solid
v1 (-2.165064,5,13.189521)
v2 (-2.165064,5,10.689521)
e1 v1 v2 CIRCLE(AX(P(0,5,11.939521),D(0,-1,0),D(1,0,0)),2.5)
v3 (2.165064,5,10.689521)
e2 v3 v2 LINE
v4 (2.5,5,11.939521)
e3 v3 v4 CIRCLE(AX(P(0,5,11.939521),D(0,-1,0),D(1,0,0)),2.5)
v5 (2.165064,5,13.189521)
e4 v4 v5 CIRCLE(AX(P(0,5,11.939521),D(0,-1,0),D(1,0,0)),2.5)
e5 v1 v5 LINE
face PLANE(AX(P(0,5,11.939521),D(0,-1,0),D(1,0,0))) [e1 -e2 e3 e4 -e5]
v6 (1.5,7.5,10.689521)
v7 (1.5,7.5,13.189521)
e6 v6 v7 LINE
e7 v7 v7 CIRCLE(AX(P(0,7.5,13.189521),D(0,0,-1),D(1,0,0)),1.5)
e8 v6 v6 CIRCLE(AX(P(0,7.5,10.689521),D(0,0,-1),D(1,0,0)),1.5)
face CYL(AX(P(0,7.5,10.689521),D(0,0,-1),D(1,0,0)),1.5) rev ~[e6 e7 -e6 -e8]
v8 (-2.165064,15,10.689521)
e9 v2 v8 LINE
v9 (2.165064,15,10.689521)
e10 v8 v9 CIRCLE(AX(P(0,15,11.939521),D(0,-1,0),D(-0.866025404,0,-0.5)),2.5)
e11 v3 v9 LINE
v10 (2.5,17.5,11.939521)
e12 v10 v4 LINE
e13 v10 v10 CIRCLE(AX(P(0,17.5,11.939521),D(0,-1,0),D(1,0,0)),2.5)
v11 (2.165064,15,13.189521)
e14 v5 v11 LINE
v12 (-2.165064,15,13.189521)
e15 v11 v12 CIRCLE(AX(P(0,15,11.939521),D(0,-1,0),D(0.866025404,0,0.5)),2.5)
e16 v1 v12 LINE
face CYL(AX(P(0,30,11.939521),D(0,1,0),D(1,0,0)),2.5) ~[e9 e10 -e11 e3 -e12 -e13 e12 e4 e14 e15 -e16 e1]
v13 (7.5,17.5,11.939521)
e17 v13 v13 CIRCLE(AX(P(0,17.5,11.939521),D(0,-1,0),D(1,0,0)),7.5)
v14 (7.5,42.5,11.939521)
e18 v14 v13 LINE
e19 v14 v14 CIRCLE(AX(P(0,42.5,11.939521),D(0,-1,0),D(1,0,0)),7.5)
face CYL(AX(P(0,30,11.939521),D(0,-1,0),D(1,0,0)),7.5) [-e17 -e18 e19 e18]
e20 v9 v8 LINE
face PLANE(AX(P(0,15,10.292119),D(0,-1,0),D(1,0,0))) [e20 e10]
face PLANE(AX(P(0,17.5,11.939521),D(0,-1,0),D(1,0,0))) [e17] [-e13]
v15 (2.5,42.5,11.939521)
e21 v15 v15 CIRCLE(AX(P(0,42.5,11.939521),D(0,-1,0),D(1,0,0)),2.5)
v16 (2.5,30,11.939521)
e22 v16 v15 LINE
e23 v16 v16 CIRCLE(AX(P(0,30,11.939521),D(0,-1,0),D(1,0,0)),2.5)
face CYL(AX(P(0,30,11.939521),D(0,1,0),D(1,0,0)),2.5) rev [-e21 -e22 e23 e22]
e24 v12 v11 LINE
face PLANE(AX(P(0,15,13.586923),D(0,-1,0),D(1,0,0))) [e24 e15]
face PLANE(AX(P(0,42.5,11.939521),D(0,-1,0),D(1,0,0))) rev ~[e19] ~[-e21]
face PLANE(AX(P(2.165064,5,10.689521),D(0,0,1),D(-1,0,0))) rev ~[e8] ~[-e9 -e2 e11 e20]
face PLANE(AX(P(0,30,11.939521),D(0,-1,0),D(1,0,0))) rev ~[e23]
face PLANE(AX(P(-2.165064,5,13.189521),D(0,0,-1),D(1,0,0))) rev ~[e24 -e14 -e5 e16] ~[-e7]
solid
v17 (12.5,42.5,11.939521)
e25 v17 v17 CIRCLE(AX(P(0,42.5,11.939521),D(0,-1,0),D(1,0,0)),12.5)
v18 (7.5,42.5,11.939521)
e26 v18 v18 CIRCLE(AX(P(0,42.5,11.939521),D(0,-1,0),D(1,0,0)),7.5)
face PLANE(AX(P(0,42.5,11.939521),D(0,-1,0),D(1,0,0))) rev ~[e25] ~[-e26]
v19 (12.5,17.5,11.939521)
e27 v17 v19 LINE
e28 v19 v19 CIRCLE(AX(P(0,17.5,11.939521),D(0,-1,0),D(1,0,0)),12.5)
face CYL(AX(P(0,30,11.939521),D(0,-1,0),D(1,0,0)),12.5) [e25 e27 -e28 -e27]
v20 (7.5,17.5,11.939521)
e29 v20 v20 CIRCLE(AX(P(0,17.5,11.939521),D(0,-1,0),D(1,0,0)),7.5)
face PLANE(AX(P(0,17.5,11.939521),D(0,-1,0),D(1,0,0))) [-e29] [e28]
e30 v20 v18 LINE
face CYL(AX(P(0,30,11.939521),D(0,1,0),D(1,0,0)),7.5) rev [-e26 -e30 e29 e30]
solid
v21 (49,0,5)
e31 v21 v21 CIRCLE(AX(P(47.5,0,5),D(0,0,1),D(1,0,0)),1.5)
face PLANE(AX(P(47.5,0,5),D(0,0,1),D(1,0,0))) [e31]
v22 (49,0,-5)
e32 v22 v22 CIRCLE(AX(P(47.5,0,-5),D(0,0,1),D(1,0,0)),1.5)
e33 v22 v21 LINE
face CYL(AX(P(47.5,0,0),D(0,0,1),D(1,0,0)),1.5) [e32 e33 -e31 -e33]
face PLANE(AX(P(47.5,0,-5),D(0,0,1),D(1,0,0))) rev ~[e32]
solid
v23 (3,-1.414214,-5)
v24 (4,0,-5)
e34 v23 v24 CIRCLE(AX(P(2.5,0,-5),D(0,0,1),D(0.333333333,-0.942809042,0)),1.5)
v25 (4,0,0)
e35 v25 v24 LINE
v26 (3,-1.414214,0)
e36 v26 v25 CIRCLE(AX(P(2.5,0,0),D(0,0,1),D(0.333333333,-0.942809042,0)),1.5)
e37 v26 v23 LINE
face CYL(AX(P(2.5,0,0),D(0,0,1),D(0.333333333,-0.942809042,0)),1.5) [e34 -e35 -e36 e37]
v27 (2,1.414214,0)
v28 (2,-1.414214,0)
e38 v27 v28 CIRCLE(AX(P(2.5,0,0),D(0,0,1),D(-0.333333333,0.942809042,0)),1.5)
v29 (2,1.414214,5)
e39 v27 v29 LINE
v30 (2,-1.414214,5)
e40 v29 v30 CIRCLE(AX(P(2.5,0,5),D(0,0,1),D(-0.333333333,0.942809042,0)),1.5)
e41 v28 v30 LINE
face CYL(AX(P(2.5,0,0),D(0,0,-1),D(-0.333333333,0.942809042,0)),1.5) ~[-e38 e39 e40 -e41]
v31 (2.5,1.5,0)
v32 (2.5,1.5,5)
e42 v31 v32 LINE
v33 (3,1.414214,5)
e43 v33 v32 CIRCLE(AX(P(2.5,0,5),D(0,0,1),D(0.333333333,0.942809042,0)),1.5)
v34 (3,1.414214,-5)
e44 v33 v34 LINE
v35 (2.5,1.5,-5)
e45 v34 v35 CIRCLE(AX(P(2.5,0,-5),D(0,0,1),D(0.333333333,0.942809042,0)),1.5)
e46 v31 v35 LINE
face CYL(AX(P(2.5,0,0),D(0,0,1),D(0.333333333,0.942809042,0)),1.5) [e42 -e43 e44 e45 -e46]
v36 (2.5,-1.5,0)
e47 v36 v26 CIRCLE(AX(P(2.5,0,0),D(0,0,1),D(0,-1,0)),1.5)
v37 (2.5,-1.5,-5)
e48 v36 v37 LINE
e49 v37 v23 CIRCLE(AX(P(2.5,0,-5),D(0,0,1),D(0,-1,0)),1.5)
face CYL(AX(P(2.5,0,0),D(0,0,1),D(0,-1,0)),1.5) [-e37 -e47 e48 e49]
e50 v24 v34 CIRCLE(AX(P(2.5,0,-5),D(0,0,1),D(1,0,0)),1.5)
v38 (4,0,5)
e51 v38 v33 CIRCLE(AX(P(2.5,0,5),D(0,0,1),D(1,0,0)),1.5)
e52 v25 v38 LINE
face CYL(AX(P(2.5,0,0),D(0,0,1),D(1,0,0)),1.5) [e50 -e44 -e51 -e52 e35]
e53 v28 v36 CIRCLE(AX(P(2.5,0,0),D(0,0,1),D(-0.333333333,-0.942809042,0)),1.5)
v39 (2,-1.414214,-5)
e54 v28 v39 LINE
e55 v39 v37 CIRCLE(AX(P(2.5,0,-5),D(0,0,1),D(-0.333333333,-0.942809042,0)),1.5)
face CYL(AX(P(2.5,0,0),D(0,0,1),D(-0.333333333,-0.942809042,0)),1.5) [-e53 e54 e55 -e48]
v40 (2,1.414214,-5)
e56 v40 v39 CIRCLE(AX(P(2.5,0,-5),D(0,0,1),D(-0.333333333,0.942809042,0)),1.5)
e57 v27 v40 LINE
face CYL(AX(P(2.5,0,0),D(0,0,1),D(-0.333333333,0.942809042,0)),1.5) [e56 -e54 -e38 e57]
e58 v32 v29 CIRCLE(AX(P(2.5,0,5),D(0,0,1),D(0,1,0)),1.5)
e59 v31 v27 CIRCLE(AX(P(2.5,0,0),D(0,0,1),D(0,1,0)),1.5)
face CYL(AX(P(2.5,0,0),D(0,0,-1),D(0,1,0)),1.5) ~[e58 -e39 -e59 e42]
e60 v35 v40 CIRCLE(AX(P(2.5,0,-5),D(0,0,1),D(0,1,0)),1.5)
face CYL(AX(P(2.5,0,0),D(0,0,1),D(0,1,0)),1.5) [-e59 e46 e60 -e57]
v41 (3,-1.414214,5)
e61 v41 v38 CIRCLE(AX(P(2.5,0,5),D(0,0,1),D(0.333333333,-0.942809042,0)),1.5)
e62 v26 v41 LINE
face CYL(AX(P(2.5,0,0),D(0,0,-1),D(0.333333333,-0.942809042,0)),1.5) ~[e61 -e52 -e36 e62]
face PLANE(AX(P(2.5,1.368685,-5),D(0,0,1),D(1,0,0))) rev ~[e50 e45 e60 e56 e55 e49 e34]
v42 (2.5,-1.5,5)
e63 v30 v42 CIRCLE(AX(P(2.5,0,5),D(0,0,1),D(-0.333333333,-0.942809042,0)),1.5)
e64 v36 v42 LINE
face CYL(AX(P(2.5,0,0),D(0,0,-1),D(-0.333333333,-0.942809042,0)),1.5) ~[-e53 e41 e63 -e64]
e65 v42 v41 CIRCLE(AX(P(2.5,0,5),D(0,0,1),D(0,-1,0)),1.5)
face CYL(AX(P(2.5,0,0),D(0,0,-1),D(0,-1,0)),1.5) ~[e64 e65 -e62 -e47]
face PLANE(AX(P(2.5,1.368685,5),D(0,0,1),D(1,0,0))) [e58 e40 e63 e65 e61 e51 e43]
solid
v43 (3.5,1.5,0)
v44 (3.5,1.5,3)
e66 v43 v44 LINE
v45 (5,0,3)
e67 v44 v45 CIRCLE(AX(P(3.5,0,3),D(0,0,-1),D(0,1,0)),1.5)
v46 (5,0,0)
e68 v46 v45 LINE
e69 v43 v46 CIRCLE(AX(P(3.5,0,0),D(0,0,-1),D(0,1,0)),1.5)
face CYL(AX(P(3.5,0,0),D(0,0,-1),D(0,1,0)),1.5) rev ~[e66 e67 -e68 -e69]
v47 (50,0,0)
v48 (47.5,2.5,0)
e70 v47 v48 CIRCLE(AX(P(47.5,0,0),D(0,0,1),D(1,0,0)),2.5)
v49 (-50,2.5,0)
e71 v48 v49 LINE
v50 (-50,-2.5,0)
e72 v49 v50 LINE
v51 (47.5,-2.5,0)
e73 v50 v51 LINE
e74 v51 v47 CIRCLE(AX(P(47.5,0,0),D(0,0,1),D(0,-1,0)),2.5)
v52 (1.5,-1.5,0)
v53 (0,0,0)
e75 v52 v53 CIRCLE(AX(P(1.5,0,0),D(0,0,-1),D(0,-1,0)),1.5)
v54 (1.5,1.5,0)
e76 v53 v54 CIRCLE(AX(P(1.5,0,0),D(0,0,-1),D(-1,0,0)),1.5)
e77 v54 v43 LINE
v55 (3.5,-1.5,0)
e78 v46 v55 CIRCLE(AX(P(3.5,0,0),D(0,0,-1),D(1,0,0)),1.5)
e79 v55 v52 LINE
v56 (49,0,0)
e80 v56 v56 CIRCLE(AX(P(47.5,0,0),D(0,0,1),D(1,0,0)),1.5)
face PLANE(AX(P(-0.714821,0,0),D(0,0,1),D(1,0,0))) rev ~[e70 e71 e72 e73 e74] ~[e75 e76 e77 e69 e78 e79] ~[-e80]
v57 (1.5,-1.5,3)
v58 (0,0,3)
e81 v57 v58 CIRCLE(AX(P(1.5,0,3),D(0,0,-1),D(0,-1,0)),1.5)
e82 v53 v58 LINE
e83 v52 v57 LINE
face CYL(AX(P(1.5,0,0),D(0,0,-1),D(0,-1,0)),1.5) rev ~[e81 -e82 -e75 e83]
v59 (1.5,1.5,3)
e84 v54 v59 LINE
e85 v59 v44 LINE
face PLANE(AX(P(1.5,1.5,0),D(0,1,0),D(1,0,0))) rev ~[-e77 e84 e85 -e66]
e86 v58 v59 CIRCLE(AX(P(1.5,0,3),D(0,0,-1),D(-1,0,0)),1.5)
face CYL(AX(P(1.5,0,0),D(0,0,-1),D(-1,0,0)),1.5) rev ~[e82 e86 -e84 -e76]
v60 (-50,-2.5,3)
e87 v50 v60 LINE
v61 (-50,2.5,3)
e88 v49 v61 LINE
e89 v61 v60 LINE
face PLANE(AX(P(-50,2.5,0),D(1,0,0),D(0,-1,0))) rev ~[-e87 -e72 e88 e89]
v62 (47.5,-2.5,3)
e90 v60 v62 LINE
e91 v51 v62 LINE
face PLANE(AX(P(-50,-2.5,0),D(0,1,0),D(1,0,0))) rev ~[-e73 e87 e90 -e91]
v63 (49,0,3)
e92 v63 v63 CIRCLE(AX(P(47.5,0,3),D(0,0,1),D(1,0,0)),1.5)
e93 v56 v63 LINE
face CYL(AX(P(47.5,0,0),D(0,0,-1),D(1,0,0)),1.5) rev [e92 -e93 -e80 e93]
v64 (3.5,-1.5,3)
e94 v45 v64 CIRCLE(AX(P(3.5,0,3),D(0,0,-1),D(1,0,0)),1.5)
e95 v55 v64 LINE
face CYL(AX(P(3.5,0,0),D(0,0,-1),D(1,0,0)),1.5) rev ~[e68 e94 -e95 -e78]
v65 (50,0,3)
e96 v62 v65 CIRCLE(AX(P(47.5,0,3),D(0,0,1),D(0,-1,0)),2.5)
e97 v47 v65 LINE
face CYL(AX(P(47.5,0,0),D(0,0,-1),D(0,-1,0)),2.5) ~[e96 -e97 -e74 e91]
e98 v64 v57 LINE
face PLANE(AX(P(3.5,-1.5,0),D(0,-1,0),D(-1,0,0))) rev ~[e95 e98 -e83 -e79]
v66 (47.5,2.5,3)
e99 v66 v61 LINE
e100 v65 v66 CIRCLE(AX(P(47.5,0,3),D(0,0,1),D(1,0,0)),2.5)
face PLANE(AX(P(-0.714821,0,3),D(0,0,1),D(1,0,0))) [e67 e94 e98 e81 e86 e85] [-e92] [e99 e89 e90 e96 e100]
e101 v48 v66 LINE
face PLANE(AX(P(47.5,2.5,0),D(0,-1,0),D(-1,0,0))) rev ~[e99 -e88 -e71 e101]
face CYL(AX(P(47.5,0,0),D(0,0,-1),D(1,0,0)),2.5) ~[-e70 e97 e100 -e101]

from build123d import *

# Parameters (mm, degrees)
F0_R      = 1.5
F1_DEPTH  = 3
F2_DEPTH  = 5
F4_R      = 12.5
F4_R_2    = 7.5
F5_DEPTH  = 12.5
F4_R_3    = 2.5
F6_DEPTH  = 12.5
F7_DEPTH  = 25
F9_DEPTH  = 10
F10_R     = 1.5
F11_DEPTH = 25


# Not quite as in the source:
# - a feature names something its author has since deleted; it is built from what else it names


with BuildPart() as f1:
    # F0 (on Top) → F1 (new body)
    with BuildSketch(Plane.XY):
        with BuildLine():
            ThreePointArc((47.5, -2.5), (45, 0), (47.5, 2.5))
            Line((47.5, 2.5), (-50, 2.5))
            Line((-50, 2.5), (-50, -2.5))
            Line((-50, -2.5), (47.5, -2.5))
        make_face()
        Polygon((1.5, 1.5), (2.5, 1.5), (3.5, 1.5), (5, 1.5), (5, 0), (5, -1.5), (3.5, -1.5), (2.5, -1.5), (1.5, -1.5), (0, -1.5), (0, 0), (0, 1.5), align=None, mode=Mode.SUBTRACT)
        with BuildLine():
            ThreePointArc((50, 0), (49.267766953, 1.767766953), (47.5, 2.5))
            ThreePointArc((47.5, 2.5), (45, 0), (47.5, -2.5))
            ThreePointArc((47.5, -2.5), (49.267766953, -1.767766953), (50, 0))
        make_face()
        with Locations((47.5, 0)):
            Circle(F0_R, mode=Mode.SUBTRACT)
        with BuildLine():
            ThreePointArc((0, 0), (0.4393398282, 1.0606601718), (1.5, 1.5))
            Line((1.5, 1.5), (0, 1.5))
            Line((0, 1.5), (0, 0))
        make_face()
        with BuildLine():
            Line((0, -1.5), (1.5, -1.5))
            ThreePointArc((1.5, -1.5), (0.4393398282, -1.0606601718), (0, 0))
            Line((0, 0), (0, -1.5))
        make_face()
        with BuildLine():
            ThreePointArc((5, 0), (4.5606601718, -1.0606601718), (3.5, -1.5))
            Line((3.5, -1.5), (5, -1.5))
            Line((5, -1.5), (5, 0))
        make_face()
        with BuildLine():
            Line((5, 1.5), (3.5, 1.5))
            ThreePointArc((3.5, 1.5), (4.5606601718, 1.0606601718), (5, 0))
            Line((5, 0), (5, 1.5))
        make_face()
    extrude(amount=F1_DEPTH)


with BuildPart() as f2:
    # F0 (on Top) → F2 (new body, symmetric)
    with BuildSketch(Plane.XY):
        with BuildLine():
            ThreePointArc((2.5, 1.1180339887), (2.7355194018, 1.290569415), (3, 1.4142135624))
            ThreePointArc((3, 1.4142135624), (2.7536529681, 1.4783978395), (2.5, 1.5))
            ThreePointArc((2.5, 1.5), (2.2463470319, 1.4783978395), (2, 1.4142135624))
            ThreePointArc((2, 1.4142135624), (2.2644805982, 1.290569415), (2.5, 1.1180339887))
        make_face()
        with BuildLine():
            ThreePointArc((2.5, -1.5), (2.7536529681, -1.4783978395), (3, -1.4142135624))
            ThreePointArc((3, -1.4142135624), (2.7355194018, -1.290569415), (2.5, -1.1180339887))
            ThreePointArc((2.5, -1.1180339887), (2.2644805982, -1.290569415), (2, -1.4142135624))
            ThreePointArc((2, -1.4142135624), (2.2463470319, -1.4783978395), (2.5, -1.5))
        make_face()
        with BuildLine():
            ThreePointArc((2.5, -1.1180339887), (2, 0), (2.5, 1.1180339887))
            ThreePointArc((2.5, 1.1180339887), (2.2644805982, 1.290569415), (2, 1.4142135624))
            ThreePointArc((2, 1.4142135624), (1, 0), (2, -1.4142135624))
            ThreePointArc((2, -1.4142135624), (2.2644805982, -1.290569415), (2.5, -1.1180339887))
        make_face()
        with BuildLine():
            ThreePointArc((3, -1.4142135624), (3.7247448714, -0.8660254038), (4, 0))
            ThreePointArc((4, 0), (3.7247448714, 0.8660254038), (3, 1.4142135624))
            ThreePointArc((3, 1.4142135624), (2.7355194018, 1.290569415), (2.5, 1.1180339887))
            ThreePointArc((2.5, 1.1180339887), (2.8693063938, 0.6123724357), (3, 0))
            ThreePointArc((3, 0), (2.8693063938, -0.6123724357), (2.5, -1.1180339887))
            ThreePointArc((2.5, -1.1180339887), (2.7355194018, -1.290569415), (3, -1.4142135624))
        make_face()
        with BuildLine():
            ThreePointArc((3, 0), (2.8693063938, 0.6123724357), (2.5, 1.1180339887))
            ThreePointArc((2.5, 1.1180339887), (2, 0), (2.5, -1.1180339887))
            ThreePointArc((2.5, -1.1180339887), (2.8693063938, -0.6123724357), (3, 0))
        make_face()
    extrude(amount=F2_DEPTH, both=True)


with BuildPart() as f2b:
    # F0 (on Top) → F2, piece 2 (new body, symmetric)
    with BuildSketch(Plane.XY):
        with Locations((47.5, 0)):
            Circle(F0_R)
    extrude(amount=F2_DEPTH, both=True)


with BuildPart() as f5:
    # F4 (on offset) → F5 (new body, symmetric)
    with BuildSketch(Plane.XZ.offset(-30)):
        with Locations((0, 11.9395209476)):
            Circle(F4_R)
        with Locations((0, 11.9395209476)):
            Circle(F4_R_2, mode=Mode.SUBTRACT)
    extrude(amount=F5_DEPTH, both=True)


with BuildPart() as f6:
    # F4 (on offset) → F6 (new body, symmetric)
    with BuildSketch(Plane.XZ.offset(-30)):
        with Locations((0, 11.9395209476)):
            Circle(F4_R_2)
        with Locations((0, 11.9395209476)):
            Circle(F4_R_3, mode=Mode.SUBTRACT)
    extrude(amount=F6_DEPTH, both=True)

    # F4 (on offset) → F7 (join)
    with BuildSketch(Plane.XZ.offset(-30)):
        with Locations((0, 11.9395209476)):
            Circle(F4_R_3)
    extrude(amount=F7_DEPTH)

    # F8 (on face) → F9 (cut)
    with BuildSketch(Plane.XZ.offset(-5)):
        with BuildLine():
            ThreePointArc((-2.1650635095, 10.6895209476), (0, 9.4395209476), (2.1650635095, 10.6895209476))
            Line((2.1650635095, 10.6895209476), (-2.1650635095, 10.6895209476))
        make_face()
        with BuildLine():
            Line((-2.1650635095, 13.1895209476), (2.1650635095, 13.1895209476))
            ThreePointArc((2.1650635095, 13.1895209476), (0, 14.4395209476), (-2.1650635095, 13.1895209476))
        make_face()
    extrude(amount=-F9_DEPTH, mode=Mode.SUBTRACT)

    # F10 (on face) → F11 (cut)
    with BuildSketch(Plane(origin=(0, 0, 10.6895209476), x_dir=(1, 0, 0), z_dir=(0, 0, -1))):
        with Locations((0, -7.5)):
            Circle(F10_R)
    extrude(amount=-F11_DEPTH, mode=Mode.SUBTRACT)


solid = Compound([f1.part, f2.part, f2b.part, f5.part, f6.part])
